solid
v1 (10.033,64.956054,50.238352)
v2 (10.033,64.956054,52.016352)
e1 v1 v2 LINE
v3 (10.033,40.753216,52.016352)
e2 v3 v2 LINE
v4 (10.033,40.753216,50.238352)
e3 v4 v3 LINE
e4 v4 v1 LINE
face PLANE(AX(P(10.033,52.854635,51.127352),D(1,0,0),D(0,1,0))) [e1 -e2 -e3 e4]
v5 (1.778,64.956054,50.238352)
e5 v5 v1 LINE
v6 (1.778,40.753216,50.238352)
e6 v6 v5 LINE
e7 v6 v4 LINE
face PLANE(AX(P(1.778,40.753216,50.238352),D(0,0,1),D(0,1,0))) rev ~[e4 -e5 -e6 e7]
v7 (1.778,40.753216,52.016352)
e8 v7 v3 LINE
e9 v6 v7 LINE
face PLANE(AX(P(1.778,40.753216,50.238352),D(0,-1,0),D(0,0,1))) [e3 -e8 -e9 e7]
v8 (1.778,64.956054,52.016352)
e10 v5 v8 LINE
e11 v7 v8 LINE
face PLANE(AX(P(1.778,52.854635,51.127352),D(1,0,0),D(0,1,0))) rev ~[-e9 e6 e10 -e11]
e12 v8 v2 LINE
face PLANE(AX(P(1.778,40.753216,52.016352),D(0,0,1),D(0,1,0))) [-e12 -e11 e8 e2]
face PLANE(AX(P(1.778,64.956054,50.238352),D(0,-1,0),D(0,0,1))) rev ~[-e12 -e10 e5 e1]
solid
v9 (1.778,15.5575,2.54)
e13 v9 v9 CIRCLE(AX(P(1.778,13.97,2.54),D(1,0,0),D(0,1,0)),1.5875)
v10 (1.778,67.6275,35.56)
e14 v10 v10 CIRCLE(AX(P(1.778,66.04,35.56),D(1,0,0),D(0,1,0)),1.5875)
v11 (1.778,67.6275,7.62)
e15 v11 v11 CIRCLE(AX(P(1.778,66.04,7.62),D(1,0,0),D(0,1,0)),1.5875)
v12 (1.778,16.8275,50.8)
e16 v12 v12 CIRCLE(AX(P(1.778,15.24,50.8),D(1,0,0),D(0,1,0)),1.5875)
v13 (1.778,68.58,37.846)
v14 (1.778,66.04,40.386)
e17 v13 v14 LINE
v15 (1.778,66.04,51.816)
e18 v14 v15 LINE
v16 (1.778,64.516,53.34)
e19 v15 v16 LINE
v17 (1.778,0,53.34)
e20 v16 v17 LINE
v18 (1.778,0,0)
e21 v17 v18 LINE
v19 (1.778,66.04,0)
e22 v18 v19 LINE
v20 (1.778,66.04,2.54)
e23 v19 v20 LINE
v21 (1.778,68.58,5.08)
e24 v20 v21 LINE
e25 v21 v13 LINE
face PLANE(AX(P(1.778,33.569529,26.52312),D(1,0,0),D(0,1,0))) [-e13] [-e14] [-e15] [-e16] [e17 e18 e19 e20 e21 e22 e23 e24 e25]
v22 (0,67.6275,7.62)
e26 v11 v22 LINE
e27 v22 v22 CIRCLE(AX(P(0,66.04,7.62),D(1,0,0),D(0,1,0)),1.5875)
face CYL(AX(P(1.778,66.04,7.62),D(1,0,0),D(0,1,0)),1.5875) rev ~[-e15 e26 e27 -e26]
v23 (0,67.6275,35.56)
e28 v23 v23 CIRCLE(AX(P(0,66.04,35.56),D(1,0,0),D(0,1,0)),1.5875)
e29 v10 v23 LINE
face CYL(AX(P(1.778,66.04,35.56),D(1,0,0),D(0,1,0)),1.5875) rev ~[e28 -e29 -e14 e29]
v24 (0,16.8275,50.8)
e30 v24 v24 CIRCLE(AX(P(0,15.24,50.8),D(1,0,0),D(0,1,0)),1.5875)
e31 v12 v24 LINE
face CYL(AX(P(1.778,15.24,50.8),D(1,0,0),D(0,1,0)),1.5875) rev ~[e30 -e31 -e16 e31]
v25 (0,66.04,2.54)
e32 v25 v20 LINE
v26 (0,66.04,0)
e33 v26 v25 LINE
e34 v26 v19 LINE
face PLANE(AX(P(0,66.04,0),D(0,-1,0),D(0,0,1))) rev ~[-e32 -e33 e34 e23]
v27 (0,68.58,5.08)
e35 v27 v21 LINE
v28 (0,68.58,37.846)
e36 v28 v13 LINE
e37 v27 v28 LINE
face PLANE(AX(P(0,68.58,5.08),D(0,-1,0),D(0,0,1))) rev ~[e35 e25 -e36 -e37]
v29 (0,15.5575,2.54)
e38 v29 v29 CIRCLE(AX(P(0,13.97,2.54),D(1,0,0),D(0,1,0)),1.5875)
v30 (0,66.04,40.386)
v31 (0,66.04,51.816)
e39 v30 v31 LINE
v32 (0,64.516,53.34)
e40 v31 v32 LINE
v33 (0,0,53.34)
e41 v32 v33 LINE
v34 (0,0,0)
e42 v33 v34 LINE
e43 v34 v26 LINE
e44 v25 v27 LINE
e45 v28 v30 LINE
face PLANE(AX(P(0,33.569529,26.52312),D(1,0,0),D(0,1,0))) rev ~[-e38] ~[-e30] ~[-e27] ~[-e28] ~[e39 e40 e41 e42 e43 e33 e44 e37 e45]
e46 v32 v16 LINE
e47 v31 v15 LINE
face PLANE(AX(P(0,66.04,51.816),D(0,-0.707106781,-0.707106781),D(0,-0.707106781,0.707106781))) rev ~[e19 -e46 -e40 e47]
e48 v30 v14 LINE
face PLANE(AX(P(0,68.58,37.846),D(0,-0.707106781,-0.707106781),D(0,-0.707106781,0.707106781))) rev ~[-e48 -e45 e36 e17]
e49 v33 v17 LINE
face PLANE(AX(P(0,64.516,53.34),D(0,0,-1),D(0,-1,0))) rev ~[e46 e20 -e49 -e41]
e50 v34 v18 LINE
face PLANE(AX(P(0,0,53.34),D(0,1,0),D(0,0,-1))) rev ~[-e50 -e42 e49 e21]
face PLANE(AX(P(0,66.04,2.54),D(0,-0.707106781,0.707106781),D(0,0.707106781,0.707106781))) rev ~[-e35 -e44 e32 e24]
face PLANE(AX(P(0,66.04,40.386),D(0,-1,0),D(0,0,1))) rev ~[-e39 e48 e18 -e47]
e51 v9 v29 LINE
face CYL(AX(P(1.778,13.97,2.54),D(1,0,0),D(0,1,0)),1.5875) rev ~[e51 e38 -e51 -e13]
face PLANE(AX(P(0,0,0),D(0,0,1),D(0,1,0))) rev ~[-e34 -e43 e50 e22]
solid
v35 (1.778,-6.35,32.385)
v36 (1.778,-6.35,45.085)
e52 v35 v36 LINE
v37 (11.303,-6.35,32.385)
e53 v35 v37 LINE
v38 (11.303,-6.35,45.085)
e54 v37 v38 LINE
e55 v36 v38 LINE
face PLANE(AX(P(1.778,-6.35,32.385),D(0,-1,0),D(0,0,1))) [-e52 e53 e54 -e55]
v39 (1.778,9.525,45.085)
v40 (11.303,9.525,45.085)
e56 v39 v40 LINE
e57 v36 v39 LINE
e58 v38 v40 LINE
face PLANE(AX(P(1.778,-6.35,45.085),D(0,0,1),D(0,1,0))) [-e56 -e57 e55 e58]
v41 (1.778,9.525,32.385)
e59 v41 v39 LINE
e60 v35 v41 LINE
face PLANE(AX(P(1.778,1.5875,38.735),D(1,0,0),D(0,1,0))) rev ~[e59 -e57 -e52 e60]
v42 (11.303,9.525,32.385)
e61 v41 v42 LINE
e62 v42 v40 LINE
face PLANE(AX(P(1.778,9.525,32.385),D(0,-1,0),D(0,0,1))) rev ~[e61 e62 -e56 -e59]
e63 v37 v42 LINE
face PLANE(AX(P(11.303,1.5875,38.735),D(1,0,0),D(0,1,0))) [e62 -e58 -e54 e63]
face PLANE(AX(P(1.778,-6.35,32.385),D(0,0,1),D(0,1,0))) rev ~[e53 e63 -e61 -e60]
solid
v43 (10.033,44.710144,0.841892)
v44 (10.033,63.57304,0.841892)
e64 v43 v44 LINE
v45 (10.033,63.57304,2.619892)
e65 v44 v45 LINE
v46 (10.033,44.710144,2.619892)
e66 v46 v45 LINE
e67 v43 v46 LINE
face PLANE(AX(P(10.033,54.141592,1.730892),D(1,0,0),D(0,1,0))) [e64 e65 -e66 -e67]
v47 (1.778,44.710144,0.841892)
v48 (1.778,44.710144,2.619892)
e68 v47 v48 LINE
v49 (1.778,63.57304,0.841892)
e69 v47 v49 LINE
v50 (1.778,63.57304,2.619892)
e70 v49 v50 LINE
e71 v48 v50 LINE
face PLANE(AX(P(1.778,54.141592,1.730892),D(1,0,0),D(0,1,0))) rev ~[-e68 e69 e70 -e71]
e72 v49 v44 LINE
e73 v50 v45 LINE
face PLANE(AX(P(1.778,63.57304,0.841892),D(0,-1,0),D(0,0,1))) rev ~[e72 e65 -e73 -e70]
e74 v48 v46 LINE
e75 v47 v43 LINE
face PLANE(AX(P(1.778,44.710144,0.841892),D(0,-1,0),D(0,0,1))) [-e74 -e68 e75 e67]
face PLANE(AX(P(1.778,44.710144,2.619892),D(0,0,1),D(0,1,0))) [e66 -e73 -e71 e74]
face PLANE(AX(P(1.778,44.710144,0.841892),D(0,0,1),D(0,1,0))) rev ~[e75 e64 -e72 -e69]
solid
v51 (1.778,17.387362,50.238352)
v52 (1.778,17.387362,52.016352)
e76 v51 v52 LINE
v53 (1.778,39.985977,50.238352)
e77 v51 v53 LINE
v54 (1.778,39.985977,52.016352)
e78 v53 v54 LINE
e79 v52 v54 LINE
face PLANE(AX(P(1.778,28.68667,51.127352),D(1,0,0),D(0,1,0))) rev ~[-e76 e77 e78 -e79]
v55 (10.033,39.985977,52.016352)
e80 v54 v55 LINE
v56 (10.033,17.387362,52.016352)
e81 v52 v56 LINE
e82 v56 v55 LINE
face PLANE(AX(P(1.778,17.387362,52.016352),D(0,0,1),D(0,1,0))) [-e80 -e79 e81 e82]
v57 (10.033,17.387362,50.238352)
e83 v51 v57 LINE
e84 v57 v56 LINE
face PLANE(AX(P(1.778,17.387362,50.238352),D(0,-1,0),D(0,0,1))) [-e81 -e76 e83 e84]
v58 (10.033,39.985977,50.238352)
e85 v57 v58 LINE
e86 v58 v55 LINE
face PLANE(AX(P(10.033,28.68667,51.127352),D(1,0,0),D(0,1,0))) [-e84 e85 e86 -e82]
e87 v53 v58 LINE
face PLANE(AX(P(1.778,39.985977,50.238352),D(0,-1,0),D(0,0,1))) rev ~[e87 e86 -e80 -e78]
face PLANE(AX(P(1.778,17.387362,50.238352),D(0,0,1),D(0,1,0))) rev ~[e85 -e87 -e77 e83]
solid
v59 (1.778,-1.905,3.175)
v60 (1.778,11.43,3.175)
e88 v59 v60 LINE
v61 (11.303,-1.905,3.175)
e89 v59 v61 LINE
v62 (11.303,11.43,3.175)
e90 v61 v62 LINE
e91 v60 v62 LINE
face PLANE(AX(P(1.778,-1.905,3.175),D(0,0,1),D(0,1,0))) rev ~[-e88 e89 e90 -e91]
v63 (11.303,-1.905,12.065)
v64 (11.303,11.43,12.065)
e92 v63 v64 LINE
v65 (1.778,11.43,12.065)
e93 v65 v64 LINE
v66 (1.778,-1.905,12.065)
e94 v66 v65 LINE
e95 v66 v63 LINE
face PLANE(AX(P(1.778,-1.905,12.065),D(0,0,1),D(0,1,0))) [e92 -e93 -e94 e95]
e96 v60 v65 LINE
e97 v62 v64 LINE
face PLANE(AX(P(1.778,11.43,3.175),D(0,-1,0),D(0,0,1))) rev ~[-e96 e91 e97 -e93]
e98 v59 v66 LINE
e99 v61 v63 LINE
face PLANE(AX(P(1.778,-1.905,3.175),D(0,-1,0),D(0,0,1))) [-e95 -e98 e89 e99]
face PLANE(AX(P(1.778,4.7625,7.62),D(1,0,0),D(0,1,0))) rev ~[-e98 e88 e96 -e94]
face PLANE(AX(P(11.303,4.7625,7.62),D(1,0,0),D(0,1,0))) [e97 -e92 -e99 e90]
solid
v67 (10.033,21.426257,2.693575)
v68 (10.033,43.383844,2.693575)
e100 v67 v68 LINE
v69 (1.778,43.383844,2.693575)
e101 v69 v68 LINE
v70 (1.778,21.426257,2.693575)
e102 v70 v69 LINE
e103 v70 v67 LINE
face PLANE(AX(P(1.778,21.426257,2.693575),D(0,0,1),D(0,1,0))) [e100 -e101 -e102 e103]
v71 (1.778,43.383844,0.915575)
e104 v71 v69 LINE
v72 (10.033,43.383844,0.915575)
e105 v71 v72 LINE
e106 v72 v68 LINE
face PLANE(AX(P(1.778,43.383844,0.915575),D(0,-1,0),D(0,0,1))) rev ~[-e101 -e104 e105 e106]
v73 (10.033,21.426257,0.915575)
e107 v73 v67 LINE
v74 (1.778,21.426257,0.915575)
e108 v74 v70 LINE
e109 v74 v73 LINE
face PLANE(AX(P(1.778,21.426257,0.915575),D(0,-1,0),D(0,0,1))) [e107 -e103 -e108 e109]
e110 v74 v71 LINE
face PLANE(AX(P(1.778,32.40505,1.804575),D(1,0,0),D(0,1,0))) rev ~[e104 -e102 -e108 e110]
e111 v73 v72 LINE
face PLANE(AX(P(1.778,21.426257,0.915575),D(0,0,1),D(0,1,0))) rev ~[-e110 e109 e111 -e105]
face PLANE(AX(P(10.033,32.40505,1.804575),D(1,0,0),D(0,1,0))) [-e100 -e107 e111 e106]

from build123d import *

# Parameters (mm, degrees)
F1_DEPTH = 1.778
F2_R     = 1.5875
F3_DEPTH = 1.778
F4_W     = 13.335
F4_H     = 8.89
F5_DEPTH = 9.525
F4_W_2   = 15.875
F4_H_2   = 12.7
F6_W     = 22.5986149162
F6_H     = 1.778
F7_DEPTH = 8.255
F6_W_2   = 24.2028385401
F6_W_3   = 21.9575874507
F6_W_4   = 18.8628956676


# Not quite as in the source:
# - a feature of the source that left no trace in its solid (it failed there, or was rolled back) is left out


with BuildPart() as f1:
    # F0 (on Right) → F1 (new body)
    with BuildSketch(Plane.YZ):
        Polygon((64.516, 53.34), (0, 53.34), (0, 0), (66.04, 0), (66.04, 2.54), (68.58, 5.08), (68.58, 37.846), (66.04, 40.386), (66.04, 51.816), align=None)
    extrude(amount=F1_DEPTH)

    # F2 (on face) → F3 (cut)
    with BuildSketch(Plane.YZ.offset(1.778)):
        with Locations((13.97, 2.54)):
            Circle(F2_R)
        with Locations((15.24, 50.8)):
            Circle(F2_R)
        with Locations((66.04, 35.56)):
            Circle(F2_R)
        with Locations((66.04, 7.62)):
            Circle(F2_R)
    extrude(amount=-F3_DEPTH, mode=Mode.SUBTRACT)


with BuildPart() as f5:
    # F4 (on face) → F5 (new body)
    with BuildSketch(Plane.YZ.offset(1.778)):
        with Locations((4.7625, 7.62)):
            Rectangle(F4_W, F4_H)
    extrude(amount=F5_DEPTH)


with BuildPart() as f5b:
    # F4 (on face) → F5, piece 2 (new body)
    with BuildSketch(Plane.YZ.offset(1.778)):
        with Locations((1.5875, 38.735)):
            Rectangle(F4_W_2, F4_H_2)
    extrude(amount=F5_DEPTH)


with BuildPart() as f7:
    # F6 (on face) → F7 (new body)
    with BuildSketch(Plane.YZ.offset(1.778)):
        with Locations((28.6866696551, 51.1273522689)):
            Rectangle(F6_W, F6_H)
    extrude(amount=F7_DEPTH)


with BuildPart() as f7b:
    # F6 (on face) → F7, piece 2 (new body)
    with BuildSketch(Plane.YZ.offset(1.778)):
        with Locations((52.8546348214, 51.1273522689)):
            Rectangle(F6_W_2, F6_H)
    extrude(amount=F7_DEPTH)


with BuildPart() as f7c:
    # F6 (on face) → F7, piece 3 (new body)
    with BuildSketch(Plane.YZ.offset(1.778)):
        with Locations((32.4050504714, 1.8045752487)):
            Rectangle(F6_W_3, F6_H)
    extrude(amount=F7_DEPTH)


with BuildPart() as f7d:
    # F6 (on face) → F7, piece 4 (new body)
    with BuildSketch(Plane.YZ.offset(1.778)):
        with Locations((54.1415922344, 1.7308921498)):
            Rectangle(F6_W_4, F6_H)
    extrude(amount=F7_DEPTH)


solid = Compound([f1.part, f5.part, f5b.part, f7.part, f7b.part, f7c.part, f7d.part])
